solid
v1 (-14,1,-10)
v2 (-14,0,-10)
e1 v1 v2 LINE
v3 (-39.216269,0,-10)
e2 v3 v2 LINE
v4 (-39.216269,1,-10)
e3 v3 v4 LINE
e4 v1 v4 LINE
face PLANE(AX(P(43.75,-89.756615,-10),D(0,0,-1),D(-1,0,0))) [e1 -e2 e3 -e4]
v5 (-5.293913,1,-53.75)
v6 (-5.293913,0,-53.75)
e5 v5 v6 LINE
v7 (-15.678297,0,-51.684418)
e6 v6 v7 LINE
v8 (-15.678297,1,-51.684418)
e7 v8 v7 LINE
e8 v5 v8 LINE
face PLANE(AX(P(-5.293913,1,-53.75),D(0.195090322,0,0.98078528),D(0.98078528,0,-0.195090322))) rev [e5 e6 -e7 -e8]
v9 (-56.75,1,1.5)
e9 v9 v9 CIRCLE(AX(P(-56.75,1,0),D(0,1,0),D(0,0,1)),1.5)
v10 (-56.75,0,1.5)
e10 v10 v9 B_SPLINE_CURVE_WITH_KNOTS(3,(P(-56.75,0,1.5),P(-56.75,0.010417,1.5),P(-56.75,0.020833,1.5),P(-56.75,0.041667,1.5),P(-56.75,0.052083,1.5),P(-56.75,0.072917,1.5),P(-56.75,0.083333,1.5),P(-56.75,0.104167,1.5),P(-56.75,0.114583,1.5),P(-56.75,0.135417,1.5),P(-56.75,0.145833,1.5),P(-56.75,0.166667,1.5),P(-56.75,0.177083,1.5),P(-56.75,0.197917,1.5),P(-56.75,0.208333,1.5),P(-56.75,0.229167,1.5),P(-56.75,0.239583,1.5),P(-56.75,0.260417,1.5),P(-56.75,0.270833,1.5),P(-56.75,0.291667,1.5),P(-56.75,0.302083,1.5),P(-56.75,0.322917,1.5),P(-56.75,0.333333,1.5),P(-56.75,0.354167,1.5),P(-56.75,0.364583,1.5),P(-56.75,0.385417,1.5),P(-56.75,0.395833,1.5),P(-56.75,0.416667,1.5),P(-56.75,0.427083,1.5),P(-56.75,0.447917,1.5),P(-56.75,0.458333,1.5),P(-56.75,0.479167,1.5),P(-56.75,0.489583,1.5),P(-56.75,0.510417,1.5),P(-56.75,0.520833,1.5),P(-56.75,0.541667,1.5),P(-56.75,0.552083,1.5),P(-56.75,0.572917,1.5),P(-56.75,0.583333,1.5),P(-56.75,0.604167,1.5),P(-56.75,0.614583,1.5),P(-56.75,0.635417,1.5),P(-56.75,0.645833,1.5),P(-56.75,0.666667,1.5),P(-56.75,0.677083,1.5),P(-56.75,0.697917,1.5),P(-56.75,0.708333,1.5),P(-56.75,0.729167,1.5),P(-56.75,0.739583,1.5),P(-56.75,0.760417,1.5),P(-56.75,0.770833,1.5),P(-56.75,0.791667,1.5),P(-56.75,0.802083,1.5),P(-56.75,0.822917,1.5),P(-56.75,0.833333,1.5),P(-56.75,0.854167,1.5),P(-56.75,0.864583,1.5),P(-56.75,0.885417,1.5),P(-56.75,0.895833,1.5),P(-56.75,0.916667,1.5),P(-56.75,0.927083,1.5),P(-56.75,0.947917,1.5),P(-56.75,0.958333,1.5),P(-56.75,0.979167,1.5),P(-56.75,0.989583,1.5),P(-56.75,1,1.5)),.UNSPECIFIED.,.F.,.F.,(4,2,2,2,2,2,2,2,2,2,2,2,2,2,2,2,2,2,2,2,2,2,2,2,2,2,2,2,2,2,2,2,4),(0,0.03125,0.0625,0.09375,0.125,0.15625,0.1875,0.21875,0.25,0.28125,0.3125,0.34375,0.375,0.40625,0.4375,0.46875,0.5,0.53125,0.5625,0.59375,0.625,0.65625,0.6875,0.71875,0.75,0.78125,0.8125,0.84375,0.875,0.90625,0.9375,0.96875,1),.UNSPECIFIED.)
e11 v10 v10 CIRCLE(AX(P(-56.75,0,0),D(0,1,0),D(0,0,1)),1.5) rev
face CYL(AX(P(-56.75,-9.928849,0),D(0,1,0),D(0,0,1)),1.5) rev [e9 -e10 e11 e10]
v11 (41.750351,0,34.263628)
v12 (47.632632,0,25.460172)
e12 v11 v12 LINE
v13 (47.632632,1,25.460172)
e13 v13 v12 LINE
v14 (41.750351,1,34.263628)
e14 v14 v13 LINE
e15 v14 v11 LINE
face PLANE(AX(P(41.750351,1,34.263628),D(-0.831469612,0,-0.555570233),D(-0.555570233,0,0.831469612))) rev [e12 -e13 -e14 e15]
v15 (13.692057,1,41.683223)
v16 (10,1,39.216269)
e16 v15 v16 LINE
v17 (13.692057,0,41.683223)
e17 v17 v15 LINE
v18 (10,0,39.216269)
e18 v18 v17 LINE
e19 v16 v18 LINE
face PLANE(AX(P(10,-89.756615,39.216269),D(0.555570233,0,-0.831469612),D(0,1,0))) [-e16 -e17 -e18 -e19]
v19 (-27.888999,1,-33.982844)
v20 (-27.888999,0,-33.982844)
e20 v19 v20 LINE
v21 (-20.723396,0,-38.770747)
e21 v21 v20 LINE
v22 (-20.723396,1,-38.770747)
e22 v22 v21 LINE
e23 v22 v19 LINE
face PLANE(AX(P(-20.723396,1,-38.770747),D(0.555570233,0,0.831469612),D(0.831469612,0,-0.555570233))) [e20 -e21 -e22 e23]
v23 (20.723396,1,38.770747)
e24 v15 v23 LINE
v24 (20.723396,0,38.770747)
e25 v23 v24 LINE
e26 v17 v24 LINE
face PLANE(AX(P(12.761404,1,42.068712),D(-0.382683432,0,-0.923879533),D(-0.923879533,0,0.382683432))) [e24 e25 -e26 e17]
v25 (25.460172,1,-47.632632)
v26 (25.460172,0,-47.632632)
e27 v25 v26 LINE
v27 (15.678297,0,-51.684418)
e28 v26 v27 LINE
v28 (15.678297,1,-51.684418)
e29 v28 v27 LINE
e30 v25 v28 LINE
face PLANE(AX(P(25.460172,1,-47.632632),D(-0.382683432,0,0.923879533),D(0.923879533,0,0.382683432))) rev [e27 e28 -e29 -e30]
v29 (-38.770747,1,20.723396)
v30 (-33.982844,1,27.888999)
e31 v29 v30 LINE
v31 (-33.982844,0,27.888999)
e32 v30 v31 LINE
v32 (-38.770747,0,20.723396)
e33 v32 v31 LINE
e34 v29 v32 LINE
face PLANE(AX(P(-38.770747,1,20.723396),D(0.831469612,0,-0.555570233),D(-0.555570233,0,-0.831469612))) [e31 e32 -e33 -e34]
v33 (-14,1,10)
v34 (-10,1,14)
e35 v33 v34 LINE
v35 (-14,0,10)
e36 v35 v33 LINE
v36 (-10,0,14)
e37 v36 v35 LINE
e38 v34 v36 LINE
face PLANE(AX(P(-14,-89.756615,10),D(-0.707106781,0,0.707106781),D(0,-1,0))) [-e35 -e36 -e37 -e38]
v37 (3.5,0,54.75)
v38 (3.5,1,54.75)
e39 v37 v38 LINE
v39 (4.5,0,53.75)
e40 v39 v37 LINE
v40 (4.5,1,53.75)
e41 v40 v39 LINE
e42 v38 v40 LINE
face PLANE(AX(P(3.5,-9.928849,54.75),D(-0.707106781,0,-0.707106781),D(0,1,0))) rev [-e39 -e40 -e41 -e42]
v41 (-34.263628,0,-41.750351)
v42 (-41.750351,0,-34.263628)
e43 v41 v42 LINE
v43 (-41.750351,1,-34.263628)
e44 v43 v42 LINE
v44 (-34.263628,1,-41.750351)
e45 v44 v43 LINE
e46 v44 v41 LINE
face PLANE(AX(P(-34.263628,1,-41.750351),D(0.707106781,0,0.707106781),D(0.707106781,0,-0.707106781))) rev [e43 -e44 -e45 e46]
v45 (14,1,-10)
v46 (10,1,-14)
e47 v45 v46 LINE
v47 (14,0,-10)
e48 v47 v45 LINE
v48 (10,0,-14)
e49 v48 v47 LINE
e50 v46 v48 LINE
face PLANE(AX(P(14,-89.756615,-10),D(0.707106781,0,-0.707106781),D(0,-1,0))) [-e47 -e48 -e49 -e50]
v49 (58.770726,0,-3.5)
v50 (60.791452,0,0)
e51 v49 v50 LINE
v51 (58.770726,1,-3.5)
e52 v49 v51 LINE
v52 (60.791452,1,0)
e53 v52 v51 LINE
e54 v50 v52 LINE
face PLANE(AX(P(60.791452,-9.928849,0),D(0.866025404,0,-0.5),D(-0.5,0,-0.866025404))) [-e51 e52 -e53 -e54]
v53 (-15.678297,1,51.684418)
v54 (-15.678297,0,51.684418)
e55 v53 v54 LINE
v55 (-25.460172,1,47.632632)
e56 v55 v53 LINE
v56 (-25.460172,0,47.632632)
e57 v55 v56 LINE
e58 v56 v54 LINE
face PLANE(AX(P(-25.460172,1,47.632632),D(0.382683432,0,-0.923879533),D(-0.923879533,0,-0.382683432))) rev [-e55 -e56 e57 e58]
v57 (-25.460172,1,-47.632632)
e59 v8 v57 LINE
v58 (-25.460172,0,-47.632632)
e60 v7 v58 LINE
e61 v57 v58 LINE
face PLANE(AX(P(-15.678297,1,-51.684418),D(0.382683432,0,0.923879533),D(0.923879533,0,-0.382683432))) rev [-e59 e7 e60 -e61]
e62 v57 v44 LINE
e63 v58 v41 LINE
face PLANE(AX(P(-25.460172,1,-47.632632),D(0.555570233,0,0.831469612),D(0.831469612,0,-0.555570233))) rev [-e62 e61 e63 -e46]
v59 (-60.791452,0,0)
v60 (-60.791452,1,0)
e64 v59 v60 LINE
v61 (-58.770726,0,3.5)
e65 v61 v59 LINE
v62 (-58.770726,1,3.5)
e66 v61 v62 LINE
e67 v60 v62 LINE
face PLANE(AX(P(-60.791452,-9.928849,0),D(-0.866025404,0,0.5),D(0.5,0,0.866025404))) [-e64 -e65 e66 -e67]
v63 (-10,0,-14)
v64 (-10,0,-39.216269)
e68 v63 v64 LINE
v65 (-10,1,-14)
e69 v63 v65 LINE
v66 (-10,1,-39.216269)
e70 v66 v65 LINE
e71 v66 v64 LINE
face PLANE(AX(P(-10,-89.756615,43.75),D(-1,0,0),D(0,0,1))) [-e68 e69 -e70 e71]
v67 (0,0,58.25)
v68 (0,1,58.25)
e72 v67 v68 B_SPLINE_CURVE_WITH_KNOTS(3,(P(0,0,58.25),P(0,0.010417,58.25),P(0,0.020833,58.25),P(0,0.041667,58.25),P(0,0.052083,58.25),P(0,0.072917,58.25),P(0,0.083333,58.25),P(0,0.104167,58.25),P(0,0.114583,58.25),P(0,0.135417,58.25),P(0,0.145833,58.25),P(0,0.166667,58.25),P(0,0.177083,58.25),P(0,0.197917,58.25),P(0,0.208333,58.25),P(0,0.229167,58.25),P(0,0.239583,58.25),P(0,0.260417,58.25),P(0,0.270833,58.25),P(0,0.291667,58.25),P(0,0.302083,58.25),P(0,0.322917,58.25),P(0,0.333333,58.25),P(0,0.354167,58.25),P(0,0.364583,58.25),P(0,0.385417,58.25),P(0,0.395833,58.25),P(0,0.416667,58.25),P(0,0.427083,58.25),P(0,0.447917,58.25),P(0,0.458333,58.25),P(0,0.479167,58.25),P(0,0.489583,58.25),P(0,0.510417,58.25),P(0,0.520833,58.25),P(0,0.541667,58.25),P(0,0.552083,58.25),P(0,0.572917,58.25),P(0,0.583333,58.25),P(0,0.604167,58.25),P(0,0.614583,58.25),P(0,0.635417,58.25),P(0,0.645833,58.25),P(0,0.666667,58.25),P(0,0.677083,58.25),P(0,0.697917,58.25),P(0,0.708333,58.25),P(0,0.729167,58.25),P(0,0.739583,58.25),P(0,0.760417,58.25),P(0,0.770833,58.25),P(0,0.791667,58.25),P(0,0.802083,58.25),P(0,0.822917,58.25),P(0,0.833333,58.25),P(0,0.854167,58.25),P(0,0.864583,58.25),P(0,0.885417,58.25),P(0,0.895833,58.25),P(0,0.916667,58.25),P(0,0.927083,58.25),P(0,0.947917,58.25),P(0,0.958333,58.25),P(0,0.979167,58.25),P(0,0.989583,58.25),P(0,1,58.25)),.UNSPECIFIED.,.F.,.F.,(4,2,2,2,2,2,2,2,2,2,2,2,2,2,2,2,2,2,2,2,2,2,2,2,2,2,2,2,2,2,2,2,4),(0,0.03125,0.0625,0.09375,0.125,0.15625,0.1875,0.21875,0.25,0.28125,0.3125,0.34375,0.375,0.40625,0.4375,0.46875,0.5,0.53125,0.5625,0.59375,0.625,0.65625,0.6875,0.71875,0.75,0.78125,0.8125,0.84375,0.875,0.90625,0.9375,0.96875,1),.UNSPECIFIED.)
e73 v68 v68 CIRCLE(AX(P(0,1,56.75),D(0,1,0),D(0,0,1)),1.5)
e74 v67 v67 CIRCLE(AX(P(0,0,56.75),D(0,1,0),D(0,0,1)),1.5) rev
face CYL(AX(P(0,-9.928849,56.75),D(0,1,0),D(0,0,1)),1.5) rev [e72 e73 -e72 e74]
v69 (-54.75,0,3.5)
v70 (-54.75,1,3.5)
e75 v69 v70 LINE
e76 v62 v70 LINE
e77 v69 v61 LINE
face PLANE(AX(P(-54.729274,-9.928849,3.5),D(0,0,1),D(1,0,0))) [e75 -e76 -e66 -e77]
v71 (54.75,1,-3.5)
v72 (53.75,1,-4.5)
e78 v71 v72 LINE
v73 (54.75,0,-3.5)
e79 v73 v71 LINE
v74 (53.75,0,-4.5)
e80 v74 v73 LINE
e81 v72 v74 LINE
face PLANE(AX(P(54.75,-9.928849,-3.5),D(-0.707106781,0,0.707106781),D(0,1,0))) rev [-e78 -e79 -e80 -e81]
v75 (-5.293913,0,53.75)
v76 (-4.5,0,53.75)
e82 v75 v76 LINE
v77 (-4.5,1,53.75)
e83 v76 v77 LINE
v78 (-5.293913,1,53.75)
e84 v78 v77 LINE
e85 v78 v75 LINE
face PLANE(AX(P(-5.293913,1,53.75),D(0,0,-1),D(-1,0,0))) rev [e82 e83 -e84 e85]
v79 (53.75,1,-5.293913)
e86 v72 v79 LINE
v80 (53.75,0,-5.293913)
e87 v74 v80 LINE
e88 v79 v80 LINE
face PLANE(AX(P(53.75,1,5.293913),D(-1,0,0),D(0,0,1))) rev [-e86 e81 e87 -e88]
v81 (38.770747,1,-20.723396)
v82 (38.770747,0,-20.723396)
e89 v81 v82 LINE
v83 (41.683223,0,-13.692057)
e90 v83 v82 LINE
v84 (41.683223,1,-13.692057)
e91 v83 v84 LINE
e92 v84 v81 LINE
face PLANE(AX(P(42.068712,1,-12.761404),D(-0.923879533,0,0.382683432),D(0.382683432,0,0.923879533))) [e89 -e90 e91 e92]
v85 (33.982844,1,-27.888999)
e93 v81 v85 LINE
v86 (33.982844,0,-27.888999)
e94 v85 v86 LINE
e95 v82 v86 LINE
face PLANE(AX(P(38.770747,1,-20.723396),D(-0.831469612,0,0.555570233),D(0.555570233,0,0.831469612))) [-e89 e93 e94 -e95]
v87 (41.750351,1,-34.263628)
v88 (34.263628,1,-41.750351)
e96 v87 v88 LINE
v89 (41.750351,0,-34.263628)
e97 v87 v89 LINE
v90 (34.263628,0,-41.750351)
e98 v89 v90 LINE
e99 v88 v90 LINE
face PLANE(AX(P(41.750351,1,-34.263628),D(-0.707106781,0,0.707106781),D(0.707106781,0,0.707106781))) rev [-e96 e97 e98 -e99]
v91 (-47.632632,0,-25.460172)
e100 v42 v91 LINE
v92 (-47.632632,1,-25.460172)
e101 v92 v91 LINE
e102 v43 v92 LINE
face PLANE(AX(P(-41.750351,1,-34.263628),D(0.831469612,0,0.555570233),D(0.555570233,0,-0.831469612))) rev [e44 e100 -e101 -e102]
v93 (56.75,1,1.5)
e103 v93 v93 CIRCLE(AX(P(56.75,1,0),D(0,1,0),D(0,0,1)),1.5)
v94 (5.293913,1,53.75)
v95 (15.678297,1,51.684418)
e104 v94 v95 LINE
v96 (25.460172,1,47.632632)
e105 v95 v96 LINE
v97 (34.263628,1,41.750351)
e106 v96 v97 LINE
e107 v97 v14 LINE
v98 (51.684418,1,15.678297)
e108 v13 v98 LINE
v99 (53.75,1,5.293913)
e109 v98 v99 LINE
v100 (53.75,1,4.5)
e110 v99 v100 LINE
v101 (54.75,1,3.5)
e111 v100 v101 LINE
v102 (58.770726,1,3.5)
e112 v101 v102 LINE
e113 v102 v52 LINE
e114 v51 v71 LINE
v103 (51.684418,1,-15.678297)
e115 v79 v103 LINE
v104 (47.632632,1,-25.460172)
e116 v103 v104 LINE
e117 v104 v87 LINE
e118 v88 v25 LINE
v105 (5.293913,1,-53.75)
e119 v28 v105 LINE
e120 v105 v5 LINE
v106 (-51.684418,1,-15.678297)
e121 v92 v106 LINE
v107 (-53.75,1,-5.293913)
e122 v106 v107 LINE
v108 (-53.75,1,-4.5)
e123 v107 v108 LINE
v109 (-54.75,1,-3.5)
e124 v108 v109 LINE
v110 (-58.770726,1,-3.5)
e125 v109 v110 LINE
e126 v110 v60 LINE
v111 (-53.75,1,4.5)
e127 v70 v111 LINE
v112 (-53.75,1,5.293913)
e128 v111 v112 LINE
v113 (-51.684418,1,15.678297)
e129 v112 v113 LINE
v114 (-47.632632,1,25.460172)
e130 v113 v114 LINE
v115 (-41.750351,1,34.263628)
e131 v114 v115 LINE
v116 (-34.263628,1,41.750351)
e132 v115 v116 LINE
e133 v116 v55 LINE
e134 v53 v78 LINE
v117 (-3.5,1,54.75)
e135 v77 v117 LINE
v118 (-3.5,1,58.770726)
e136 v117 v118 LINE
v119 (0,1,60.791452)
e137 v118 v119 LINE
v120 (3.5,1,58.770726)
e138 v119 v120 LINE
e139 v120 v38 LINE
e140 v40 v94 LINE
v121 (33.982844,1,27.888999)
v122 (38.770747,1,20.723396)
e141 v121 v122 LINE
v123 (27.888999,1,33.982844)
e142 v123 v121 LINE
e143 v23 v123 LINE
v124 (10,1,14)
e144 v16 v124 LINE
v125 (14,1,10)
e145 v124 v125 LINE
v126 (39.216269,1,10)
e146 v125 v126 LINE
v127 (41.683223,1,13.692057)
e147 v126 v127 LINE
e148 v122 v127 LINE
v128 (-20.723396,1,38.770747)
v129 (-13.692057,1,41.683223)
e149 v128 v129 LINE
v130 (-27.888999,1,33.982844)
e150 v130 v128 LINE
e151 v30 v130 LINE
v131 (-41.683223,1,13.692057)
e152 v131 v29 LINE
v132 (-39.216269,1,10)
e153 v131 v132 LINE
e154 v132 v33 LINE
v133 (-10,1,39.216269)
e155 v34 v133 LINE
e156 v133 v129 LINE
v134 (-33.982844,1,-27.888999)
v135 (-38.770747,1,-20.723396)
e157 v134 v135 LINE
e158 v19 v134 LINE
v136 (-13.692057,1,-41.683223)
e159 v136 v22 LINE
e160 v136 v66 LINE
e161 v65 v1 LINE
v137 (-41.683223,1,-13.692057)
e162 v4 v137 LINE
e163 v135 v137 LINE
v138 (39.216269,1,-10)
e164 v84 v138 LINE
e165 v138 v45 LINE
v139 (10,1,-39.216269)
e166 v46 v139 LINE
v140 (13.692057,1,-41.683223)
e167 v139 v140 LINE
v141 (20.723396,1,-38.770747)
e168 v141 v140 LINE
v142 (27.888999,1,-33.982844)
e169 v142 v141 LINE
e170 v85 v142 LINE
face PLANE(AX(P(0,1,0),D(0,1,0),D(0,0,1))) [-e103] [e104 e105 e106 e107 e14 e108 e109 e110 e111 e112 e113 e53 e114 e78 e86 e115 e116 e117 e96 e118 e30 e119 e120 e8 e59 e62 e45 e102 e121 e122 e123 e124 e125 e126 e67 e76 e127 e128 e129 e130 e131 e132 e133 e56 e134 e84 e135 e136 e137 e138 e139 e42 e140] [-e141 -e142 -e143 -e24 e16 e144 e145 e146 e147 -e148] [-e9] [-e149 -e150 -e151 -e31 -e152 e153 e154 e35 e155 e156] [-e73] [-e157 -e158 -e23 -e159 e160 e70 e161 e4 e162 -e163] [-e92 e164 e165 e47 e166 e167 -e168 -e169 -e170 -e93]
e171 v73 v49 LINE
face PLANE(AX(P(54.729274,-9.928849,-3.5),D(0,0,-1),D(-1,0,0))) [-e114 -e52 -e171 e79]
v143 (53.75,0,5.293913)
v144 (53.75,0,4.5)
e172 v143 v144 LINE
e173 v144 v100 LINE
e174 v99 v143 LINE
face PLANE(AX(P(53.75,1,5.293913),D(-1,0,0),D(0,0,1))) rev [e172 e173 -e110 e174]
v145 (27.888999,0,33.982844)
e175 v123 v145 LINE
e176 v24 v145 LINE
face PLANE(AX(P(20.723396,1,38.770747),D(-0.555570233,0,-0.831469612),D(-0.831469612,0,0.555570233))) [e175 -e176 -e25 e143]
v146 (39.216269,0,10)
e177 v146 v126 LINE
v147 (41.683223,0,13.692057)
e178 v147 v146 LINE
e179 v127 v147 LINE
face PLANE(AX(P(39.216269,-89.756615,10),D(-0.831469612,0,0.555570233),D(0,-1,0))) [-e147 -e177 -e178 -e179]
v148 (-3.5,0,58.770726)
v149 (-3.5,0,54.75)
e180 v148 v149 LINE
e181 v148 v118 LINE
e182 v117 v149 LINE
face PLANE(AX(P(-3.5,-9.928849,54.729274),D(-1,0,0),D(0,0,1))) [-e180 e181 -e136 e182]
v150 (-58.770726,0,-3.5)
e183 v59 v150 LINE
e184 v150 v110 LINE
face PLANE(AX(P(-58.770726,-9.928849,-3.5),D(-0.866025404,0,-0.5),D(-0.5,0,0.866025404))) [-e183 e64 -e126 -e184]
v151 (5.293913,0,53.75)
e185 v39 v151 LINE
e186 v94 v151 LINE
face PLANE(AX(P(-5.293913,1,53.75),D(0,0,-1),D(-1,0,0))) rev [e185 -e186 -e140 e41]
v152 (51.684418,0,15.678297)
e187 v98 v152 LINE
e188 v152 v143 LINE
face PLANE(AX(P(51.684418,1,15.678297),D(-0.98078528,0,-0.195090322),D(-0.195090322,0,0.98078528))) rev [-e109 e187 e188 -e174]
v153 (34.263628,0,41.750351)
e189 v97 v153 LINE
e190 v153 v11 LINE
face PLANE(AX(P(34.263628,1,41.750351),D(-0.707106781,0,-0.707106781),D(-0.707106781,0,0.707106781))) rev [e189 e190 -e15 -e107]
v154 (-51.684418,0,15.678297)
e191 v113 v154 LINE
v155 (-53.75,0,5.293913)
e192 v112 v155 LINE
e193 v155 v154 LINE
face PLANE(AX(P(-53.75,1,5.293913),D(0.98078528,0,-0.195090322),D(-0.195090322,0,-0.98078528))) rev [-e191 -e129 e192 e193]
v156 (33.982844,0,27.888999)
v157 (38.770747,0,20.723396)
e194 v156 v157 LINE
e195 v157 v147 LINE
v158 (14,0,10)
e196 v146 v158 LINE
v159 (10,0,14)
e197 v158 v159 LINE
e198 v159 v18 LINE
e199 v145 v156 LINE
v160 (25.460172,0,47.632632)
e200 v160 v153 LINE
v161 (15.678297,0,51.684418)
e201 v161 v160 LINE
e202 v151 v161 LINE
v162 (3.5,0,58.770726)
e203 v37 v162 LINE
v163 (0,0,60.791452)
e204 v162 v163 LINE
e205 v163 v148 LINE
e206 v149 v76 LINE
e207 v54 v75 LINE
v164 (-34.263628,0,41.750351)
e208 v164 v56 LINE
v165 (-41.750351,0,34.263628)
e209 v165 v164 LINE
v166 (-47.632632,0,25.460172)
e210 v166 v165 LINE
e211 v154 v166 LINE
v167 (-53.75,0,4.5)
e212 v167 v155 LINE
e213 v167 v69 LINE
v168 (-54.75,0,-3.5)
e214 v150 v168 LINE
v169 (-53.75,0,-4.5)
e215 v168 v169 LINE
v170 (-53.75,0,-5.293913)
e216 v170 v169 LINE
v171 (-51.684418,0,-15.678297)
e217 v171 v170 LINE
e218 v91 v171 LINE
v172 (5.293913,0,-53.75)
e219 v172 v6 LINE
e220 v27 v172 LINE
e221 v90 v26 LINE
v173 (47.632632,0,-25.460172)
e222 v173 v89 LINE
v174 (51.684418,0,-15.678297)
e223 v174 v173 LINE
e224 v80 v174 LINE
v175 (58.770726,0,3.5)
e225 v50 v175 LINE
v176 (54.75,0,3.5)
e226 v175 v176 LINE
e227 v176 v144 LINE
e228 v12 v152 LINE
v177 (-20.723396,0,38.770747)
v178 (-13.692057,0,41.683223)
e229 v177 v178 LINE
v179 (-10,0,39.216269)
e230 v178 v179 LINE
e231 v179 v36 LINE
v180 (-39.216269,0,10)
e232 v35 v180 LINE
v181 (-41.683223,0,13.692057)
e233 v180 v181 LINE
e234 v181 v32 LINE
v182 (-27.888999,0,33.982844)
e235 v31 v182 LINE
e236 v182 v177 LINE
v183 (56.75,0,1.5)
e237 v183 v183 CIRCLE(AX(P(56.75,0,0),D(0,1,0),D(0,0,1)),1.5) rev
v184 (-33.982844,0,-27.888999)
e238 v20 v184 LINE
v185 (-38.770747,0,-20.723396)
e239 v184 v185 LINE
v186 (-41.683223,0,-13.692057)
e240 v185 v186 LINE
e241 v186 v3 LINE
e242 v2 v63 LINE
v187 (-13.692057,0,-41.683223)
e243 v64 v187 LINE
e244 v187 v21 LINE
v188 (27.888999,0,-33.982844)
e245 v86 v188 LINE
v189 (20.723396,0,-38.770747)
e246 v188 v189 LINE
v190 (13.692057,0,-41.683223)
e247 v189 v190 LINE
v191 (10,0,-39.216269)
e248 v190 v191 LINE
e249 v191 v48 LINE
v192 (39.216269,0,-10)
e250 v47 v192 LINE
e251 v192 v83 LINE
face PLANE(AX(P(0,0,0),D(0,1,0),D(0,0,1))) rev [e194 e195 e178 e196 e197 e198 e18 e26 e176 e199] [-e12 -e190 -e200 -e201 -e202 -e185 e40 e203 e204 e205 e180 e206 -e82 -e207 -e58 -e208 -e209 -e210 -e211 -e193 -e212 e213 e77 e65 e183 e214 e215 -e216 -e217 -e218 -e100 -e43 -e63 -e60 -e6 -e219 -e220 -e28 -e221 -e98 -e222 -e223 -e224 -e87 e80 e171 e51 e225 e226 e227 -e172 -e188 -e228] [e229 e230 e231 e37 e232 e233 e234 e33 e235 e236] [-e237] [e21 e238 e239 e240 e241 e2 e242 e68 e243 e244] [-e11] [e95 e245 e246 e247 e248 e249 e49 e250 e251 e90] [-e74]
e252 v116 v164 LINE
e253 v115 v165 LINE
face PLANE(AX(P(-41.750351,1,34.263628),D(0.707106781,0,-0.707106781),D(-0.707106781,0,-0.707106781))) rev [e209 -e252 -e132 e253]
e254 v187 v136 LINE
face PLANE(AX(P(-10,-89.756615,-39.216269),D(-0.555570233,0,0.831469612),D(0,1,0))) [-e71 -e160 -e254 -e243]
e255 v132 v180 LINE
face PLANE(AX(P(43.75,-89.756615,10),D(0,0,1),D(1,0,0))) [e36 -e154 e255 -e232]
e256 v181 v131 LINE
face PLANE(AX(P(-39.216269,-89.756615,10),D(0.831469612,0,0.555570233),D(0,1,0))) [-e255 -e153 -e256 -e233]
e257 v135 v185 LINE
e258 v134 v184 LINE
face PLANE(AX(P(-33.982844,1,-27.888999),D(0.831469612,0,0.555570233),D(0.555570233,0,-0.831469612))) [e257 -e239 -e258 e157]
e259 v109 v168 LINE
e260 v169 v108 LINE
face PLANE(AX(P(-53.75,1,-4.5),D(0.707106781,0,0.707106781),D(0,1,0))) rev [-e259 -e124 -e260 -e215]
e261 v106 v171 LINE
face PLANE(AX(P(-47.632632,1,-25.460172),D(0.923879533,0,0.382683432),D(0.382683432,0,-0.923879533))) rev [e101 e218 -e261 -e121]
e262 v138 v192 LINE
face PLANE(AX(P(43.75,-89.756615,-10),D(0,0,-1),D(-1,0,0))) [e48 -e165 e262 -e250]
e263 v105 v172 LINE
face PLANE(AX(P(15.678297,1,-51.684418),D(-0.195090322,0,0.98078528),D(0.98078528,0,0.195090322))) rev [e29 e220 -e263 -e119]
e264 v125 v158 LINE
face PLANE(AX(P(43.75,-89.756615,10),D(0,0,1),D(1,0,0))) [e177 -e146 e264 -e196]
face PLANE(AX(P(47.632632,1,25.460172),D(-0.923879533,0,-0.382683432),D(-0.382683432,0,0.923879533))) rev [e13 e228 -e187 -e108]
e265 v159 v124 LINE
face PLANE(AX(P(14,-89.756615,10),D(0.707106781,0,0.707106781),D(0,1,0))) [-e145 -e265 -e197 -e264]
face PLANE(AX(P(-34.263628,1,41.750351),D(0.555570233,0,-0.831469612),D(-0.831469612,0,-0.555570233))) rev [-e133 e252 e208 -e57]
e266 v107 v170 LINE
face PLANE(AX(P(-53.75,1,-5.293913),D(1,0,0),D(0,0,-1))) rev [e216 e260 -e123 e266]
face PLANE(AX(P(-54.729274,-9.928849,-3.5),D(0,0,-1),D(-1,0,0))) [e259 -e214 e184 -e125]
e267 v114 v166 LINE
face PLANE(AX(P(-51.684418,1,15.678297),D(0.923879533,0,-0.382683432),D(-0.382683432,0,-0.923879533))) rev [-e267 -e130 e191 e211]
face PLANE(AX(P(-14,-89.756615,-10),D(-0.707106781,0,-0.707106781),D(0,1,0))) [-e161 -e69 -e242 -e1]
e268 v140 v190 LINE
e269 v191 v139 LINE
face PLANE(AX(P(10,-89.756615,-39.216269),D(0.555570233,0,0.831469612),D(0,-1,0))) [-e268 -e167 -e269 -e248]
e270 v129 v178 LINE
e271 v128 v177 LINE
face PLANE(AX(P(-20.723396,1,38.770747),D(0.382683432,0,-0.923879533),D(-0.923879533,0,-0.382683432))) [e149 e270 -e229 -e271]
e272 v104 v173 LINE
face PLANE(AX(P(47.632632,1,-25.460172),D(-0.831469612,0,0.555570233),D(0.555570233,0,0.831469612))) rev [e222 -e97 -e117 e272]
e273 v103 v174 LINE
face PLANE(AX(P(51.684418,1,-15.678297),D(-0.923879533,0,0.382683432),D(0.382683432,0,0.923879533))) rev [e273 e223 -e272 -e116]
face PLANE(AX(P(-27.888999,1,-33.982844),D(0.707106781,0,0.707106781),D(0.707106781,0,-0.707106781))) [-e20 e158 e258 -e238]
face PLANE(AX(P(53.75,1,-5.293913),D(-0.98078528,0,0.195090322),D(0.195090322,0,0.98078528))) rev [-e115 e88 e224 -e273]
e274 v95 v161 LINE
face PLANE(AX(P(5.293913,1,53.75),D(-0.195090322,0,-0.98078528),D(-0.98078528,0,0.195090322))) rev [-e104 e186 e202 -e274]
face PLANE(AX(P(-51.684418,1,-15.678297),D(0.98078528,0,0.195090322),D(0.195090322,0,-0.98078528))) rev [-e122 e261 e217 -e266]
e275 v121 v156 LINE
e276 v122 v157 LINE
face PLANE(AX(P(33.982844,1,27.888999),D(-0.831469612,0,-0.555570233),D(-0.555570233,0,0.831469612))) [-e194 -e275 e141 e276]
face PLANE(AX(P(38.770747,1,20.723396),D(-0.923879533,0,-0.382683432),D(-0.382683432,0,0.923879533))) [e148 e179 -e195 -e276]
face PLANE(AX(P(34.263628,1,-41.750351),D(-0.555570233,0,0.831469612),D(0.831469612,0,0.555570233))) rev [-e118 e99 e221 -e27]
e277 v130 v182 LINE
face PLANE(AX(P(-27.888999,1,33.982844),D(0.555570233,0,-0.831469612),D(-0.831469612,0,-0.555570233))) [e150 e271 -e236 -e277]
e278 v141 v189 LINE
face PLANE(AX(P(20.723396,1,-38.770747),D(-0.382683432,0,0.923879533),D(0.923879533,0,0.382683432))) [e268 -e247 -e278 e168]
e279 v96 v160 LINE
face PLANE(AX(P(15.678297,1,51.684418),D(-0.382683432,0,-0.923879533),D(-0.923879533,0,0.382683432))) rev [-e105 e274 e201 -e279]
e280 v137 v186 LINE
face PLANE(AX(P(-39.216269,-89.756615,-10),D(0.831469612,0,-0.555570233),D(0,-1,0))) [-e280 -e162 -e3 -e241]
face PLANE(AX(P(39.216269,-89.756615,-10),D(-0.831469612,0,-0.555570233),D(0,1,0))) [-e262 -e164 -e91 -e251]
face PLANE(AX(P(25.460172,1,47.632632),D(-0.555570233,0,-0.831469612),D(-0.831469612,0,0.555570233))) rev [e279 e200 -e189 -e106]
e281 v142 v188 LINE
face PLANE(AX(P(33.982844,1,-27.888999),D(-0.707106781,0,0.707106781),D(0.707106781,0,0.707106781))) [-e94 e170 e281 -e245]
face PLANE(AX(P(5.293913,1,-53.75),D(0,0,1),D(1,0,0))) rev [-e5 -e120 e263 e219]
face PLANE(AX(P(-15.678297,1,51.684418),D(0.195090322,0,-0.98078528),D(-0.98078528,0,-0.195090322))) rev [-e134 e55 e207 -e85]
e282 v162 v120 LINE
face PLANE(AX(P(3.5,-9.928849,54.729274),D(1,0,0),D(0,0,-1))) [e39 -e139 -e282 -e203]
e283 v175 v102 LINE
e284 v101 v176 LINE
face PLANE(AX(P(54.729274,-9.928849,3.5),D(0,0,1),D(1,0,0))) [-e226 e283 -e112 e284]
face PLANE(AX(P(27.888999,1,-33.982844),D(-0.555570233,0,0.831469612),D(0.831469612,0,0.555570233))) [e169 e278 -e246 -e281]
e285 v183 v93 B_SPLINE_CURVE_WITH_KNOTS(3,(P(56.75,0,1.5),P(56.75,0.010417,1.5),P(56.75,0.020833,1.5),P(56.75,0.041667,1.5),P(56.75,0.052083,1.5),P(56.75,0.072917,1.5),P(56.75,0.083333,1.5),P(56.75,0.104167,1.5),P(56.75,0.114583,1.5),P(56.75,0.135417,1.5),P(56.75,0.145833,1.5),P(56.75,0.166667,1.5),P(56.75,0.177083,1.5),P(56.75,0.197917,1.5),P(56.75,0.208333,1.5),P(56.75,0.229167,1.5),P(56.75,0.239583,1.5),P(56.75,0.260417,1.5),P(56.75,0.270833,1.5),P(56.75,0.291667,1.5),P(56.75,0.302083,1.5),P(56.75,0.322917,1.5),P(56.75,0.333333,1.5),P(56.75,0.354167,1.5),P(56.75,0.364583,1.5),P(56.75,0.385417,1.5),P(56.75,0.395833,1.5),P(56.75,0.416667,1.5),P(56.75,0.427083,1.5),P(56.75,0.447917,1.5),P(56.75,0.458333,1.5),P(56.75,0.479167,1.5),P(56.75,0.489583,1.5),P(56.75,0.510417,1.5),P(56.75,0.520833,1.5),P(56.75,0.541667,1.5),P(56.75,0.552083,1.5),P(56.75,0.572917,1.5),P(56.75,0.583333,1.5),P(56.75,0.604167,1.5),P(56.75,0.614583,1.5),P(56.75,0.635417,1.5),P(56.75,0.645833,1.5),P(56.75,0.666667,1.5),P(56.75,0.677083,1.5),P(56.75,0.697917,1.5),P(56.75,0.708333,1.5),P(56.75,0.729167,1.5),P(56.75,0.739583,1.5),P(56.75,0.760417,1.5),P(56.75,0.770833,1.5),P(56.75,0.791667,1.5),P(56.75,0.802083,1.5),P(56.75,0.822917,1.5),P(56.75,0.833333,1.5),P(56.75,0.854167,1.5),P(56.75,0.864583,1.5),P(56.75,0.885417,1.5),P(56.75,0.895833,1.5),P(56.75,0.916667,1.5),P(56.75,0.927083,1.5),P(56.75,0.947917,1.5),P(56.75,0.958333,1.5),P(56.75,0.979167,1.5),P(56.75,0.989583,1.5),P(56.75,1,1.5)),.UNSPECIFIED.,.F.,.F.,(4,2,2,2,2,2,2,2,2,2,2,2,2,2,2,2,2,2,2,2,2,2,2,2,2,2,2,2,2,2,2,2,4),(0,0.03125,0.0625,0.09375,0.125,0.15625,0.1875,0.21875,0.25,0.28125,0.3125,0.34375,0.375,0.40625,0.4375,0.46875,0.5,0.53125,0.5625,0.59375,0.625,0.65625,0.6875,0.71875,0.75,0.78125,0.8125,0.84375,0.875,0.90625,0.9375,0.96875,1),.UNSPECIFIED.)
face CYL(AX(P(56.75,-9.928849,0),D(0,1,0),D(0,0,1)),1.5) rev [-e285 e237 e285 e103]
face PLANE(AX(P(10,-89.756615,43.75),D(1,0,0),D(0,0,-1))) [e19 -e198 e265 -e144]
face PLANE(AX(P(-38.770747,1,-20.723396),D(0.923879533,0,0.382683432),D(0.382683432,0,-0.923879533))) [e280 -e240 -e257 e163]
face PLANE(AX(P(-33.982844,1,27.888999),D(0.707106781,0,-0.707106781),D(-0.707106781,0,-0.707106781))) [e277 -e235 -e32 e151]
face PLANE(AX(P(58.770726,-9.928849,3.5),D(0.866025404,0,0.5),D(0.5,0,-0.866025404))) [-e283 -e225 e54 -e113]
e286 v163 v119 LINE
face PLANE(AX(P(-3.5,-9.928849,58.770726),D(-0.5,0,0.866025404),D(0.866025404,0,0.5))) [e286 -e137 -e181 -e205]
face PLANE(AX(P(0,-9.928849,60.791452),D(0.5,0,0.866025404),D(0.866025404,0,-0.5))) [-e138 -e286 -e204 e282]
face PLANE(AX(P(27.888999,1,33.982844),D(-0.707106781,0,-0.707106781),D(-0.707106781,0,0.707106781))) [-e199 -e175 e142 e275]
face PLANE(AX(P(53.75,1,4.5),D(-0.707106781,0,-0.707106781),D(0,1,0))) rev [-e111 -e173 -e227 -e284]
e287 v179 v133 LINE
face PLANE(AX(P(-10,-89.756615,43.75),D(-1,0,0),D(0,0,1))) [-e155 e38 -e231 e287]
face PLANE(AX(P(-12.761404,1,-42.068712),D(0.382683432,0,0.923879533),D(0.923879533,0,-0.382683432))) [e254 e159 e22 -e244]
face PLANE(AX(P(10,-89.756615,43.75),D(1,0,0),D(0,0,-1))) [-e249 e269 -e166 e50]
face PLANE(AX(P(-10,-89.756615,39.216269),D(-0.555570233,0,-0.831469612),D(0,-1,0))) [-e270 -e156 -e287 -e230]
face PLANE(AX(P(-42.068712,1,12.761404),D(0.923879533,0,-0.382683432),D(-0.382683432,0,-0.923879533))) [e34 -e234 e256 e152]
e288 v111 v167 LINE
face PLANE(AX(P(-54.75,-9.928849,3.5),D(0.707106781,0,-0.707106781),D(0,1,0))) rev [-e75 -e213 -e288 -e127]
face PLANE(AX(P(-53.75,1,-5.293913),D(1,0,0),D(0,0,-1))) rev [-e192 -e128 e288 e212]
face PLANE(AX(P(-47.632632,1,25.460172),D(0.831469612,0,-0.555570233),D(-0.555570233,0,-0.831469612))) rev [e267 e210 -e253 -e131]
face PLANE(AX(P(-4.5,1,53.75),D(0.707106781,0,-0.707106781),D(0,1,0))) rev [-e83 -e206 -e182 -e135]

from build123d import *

# Parameters (mm, degrees)
BOSS_EXTRUDE1_DEPTH = 1
SKETCH3_W           = 20
SKETCH3_H           = 87.5
BOSS_EXTRUDE4_DEPTH = 1
CIRPATTERN1_COUNT   = 2
CIRPATTERN1_ANGLE   = 90
CHAMFER1_DEPTH      = 1
SKETCH5_R           = 1.5
BOSS_EXTRUDE6_DEPTH = 1
CHAMFER3_SIZE       = 1


with BuildPart() as part:
    # Sketch1 → Boss-Extrude1 (new body)
    with BuildSketch(Plane(origin=(0, 0, 0), x_dir=(1, 0, 0), z_dir=(0, 1, 0))):
        Polygon((53.75, 5.29391293), (51.684417643, 15.678296686), (47.632632102, 25.460172293), (41.750351221, 34.263627757), (34.263627757, 41.750351221), (25.460172293, 47.632632102), (15.678296686, 51.684417643), (5.29391293, 53.75), (-5.29391293, 53.75), (-15.678296686, 51.684417643), (-25.460172293, 47.632632102), (-34.263627757, 41.750351221), (-41.750351221, 34.263627757), (-47.632632102, 25.460172293), (-51.684417643, 15.678296686), (-53.75, 5.29391293), (-53.75, -5.29391293), (-51.684417643, -15.678296686), (-47.632632102, -25.460172293), (-41.750351221, -34.263627757), (-34.263627757, -41.750351221), (-25.460172293, -47.632632102), (-15.678296686, -51.684417643), (-5.29391293, -53.75), (5.29391293, -53.75), (15.678296686, -51.684417643), (25.460172293, -47.632632102), (34.263627757, -41.750351221), (41.750351221, -34.263627757), (47.632632102, -25.460172293), (51.684417643, -15.678296686), (53.75, -5.29391293), align=None)
        Polygon((43.75, 4.308998897), (42.068712035, 12.76140428), (38.770747059, 20.723396052), (33.982844017, 27.888999337), (27.888999337, 33.982844017), (20.723396052, 38.770747059), (12.76140428, 42.068712035), (4.308998897, 43.75), (-4.308998897, 43.75), (-12.76140428, 42.068712035), (-20.723396052, 38.770747059), (-27.888999337, 33.982844017), (-33.982844017, 27.888999337), (-38.770747059, 20.723396052), (-42.068712035, 12.76140428), (-43.75, 4.308998897), (-43.75, -4.308998897), (-42.068712035, -12.76140428), (-38.770747059, -20.723396052), (-33.982844017, -27.888999337), (-27.888999337, -33.982844017), (-20.723396052, -38.770747059), (-12.76140428, -42.068712035), (-4.308998897, -43.75), (4.308998897, -43.75), (12.76140428, -42.068712035), (20.723396052, -38.770747059), (27.888999337, -33.982844017), (33.982844017, -27.888999337), (38.770747059, -20.723396052), (42.068712035, -12.76140428), (43.75, -4.308998897), align=None, mode=Mode.SUBTRACT)
    extrude(amount=BOSS_EXTRUDE1_DEPTH)

    # Sketch3 → Boss-Extrude4 (add)
    with BuildSketch(Plane(origin=(0, 1, 0), x_dir=(1, 0, 0), z_dir=(0, 1, 0))):
        Rectangle(SKETCH3_W, SKETCH3_H)
    boss_extrude4 = extrude(amount=-BOSS_EXTRUDE4_DEPTH)

    # CirPattern1: Boss-Extrude4 ×2 about axis
    cirpattern1_axis = Axis((0, 1, 0), (0, 1, 0))
    for i in range(1, CIRPATTERN1_COUNT):
        add(boss_extrude4.rotate(cirpattern1_axis, i * CIRPATTERN1_ANGLE / (CIRPATTERN1_COUNT - 1)))

    # Chamfer1: read off the stored shape, not the designer's step
    # Chamfer1 outline → Chamfer1 (add)
    with BuildSketch(Plane(origin=(0, 0, 0), x_dir=(1, 0, 0), z_dir=(0, 1, 0))):
        Polygon((10, -10), (10, -14), (14, -10), align=None)
        Polygon((13.692057296, -41.683222934), (10, -39.216269119), (10, -42.617989498), (12.76140428, -42.068712035), align=None)
        Polygon((42.617989498, -10), (39.216269119, -10), (41.683222934, -13.692057296), (42.068712035, -12.76140428), align=None)
        Polygon((-10, 10), (-10, 14), (-14, 10), align=None)
        Polygon((-13.692057296, 41.683222934), (-10, 39.216269119), (-10, 42.617989498), (-12.76140428, 42.068712035), align=None)
        Polygon((-42.617989498, 10), (-39.216269119, 10), (-41.683222934, 13.692057296), (-42.068712035, 12.76140428), align=None)
        Polygon((10, 10), (14, 10), (10, 14), align=None)
        Polygon((41.683222934, 13.692057296), (39.216269119, 10), (42.617989498, 10), (42.068712035, 12.76140428), align=None)
        Polygon((10, 42.617989498), (10, 39.216269119), (13.692057296, 41.683222934), (12.76140428, 42.068712035), align=None)
        Polygon((-10, -10), (-14, -10), (-10, -14), align=None)
        Polygon((-41.683222934, -13.692057296), (-39.216269119, -10), (-42.617989498, -10), (-42.068712035, -12.76140428), align=None)
        Polygon((-10, -42.617989498), (-10, -39.216269119), (-13.692057296, -41.683222934), (-12.76140428, -42.068712035), align=None)
    extrude(amount=CHAMFER1_DEPTH)

    # Sketch5 → Boss-Extrude6 (add)
    # profile 1 of 3: a face of its own
    with BuildSketch(Plane(origin=(0, 1, 0), x_dir=(1, 0, 0), z_dir=(0, 1, 0))):
        Polygon((-54.729274058, 3.5), (-58.770725942, 3.5), (-60.791451884, 0), (-58.770725942, -3.5), (-54.729274058, -3.5), (-53.75, -3.5), (-53.75, 3.5), align=None)
        with Locations(Location((-56.75, 0, 0), (0, 0, 270))):
            Circle(SKETCH5_R, mode=Mode.SUBTRACT)
    # profile 2 of 3: a face of its own
    with BuildSketch(Plane(origin=(0, 1, 0), x_dir=(1, 0, 0), z_dir=(0, 1, 0))):
        Polygon((54.729274058, 3.5), (53.75, 3.5), (53.75, -3.5), (54.729274058, -3.5), (58.770725942, -3.5), (60.791451884, 0), (58.770725942, 3.5), align=None)
        with Locations(Location((56.75, 0, 0), (0, 0, 270))):
            Circle(SKETCH5_R, mode=Mode.SUBTRACT)
    # profile 3 of 3: a face of its own
    with BuildSketch(Plane(origin=(0, 1, 0), x_dir=(1, 0, 0), z_dir=(0, 1, 0))):
        Polygon((3.5, -54.729274058), (3.5, -53.75), (-3.5, -53.75), (-3.5, -54.729274058), (-3.5, -58.770725942), (0, -60.791451884), (3.5, -58.770725942), align=None)
        with Locations(Location((0, -56.75, 0), (0, 0, 270))):
            Circle(SKETCH5_R, mode=Mode.SUBTRACT)
    extrude(amount=-BOSS_EXTRUDE6_DEPTH)

    # Chamfer3
    chamfer3_edges = [part.edges().sort_by_distance(p)[0] for p in [
        (-53.75, 0.5, 3.5),
        (-53.75, 0.5, -3.5),
        (53.75, 0.5, -3.5),
        (53.75, 0.5, 3.5),
        (3.5, 0.5, 53.75),
        (-3.5, 0.5, 53.75),
    ]]
    chamfer(chamfer3_edges, length=CHAMFER3_SIZE)


solid = part.part
